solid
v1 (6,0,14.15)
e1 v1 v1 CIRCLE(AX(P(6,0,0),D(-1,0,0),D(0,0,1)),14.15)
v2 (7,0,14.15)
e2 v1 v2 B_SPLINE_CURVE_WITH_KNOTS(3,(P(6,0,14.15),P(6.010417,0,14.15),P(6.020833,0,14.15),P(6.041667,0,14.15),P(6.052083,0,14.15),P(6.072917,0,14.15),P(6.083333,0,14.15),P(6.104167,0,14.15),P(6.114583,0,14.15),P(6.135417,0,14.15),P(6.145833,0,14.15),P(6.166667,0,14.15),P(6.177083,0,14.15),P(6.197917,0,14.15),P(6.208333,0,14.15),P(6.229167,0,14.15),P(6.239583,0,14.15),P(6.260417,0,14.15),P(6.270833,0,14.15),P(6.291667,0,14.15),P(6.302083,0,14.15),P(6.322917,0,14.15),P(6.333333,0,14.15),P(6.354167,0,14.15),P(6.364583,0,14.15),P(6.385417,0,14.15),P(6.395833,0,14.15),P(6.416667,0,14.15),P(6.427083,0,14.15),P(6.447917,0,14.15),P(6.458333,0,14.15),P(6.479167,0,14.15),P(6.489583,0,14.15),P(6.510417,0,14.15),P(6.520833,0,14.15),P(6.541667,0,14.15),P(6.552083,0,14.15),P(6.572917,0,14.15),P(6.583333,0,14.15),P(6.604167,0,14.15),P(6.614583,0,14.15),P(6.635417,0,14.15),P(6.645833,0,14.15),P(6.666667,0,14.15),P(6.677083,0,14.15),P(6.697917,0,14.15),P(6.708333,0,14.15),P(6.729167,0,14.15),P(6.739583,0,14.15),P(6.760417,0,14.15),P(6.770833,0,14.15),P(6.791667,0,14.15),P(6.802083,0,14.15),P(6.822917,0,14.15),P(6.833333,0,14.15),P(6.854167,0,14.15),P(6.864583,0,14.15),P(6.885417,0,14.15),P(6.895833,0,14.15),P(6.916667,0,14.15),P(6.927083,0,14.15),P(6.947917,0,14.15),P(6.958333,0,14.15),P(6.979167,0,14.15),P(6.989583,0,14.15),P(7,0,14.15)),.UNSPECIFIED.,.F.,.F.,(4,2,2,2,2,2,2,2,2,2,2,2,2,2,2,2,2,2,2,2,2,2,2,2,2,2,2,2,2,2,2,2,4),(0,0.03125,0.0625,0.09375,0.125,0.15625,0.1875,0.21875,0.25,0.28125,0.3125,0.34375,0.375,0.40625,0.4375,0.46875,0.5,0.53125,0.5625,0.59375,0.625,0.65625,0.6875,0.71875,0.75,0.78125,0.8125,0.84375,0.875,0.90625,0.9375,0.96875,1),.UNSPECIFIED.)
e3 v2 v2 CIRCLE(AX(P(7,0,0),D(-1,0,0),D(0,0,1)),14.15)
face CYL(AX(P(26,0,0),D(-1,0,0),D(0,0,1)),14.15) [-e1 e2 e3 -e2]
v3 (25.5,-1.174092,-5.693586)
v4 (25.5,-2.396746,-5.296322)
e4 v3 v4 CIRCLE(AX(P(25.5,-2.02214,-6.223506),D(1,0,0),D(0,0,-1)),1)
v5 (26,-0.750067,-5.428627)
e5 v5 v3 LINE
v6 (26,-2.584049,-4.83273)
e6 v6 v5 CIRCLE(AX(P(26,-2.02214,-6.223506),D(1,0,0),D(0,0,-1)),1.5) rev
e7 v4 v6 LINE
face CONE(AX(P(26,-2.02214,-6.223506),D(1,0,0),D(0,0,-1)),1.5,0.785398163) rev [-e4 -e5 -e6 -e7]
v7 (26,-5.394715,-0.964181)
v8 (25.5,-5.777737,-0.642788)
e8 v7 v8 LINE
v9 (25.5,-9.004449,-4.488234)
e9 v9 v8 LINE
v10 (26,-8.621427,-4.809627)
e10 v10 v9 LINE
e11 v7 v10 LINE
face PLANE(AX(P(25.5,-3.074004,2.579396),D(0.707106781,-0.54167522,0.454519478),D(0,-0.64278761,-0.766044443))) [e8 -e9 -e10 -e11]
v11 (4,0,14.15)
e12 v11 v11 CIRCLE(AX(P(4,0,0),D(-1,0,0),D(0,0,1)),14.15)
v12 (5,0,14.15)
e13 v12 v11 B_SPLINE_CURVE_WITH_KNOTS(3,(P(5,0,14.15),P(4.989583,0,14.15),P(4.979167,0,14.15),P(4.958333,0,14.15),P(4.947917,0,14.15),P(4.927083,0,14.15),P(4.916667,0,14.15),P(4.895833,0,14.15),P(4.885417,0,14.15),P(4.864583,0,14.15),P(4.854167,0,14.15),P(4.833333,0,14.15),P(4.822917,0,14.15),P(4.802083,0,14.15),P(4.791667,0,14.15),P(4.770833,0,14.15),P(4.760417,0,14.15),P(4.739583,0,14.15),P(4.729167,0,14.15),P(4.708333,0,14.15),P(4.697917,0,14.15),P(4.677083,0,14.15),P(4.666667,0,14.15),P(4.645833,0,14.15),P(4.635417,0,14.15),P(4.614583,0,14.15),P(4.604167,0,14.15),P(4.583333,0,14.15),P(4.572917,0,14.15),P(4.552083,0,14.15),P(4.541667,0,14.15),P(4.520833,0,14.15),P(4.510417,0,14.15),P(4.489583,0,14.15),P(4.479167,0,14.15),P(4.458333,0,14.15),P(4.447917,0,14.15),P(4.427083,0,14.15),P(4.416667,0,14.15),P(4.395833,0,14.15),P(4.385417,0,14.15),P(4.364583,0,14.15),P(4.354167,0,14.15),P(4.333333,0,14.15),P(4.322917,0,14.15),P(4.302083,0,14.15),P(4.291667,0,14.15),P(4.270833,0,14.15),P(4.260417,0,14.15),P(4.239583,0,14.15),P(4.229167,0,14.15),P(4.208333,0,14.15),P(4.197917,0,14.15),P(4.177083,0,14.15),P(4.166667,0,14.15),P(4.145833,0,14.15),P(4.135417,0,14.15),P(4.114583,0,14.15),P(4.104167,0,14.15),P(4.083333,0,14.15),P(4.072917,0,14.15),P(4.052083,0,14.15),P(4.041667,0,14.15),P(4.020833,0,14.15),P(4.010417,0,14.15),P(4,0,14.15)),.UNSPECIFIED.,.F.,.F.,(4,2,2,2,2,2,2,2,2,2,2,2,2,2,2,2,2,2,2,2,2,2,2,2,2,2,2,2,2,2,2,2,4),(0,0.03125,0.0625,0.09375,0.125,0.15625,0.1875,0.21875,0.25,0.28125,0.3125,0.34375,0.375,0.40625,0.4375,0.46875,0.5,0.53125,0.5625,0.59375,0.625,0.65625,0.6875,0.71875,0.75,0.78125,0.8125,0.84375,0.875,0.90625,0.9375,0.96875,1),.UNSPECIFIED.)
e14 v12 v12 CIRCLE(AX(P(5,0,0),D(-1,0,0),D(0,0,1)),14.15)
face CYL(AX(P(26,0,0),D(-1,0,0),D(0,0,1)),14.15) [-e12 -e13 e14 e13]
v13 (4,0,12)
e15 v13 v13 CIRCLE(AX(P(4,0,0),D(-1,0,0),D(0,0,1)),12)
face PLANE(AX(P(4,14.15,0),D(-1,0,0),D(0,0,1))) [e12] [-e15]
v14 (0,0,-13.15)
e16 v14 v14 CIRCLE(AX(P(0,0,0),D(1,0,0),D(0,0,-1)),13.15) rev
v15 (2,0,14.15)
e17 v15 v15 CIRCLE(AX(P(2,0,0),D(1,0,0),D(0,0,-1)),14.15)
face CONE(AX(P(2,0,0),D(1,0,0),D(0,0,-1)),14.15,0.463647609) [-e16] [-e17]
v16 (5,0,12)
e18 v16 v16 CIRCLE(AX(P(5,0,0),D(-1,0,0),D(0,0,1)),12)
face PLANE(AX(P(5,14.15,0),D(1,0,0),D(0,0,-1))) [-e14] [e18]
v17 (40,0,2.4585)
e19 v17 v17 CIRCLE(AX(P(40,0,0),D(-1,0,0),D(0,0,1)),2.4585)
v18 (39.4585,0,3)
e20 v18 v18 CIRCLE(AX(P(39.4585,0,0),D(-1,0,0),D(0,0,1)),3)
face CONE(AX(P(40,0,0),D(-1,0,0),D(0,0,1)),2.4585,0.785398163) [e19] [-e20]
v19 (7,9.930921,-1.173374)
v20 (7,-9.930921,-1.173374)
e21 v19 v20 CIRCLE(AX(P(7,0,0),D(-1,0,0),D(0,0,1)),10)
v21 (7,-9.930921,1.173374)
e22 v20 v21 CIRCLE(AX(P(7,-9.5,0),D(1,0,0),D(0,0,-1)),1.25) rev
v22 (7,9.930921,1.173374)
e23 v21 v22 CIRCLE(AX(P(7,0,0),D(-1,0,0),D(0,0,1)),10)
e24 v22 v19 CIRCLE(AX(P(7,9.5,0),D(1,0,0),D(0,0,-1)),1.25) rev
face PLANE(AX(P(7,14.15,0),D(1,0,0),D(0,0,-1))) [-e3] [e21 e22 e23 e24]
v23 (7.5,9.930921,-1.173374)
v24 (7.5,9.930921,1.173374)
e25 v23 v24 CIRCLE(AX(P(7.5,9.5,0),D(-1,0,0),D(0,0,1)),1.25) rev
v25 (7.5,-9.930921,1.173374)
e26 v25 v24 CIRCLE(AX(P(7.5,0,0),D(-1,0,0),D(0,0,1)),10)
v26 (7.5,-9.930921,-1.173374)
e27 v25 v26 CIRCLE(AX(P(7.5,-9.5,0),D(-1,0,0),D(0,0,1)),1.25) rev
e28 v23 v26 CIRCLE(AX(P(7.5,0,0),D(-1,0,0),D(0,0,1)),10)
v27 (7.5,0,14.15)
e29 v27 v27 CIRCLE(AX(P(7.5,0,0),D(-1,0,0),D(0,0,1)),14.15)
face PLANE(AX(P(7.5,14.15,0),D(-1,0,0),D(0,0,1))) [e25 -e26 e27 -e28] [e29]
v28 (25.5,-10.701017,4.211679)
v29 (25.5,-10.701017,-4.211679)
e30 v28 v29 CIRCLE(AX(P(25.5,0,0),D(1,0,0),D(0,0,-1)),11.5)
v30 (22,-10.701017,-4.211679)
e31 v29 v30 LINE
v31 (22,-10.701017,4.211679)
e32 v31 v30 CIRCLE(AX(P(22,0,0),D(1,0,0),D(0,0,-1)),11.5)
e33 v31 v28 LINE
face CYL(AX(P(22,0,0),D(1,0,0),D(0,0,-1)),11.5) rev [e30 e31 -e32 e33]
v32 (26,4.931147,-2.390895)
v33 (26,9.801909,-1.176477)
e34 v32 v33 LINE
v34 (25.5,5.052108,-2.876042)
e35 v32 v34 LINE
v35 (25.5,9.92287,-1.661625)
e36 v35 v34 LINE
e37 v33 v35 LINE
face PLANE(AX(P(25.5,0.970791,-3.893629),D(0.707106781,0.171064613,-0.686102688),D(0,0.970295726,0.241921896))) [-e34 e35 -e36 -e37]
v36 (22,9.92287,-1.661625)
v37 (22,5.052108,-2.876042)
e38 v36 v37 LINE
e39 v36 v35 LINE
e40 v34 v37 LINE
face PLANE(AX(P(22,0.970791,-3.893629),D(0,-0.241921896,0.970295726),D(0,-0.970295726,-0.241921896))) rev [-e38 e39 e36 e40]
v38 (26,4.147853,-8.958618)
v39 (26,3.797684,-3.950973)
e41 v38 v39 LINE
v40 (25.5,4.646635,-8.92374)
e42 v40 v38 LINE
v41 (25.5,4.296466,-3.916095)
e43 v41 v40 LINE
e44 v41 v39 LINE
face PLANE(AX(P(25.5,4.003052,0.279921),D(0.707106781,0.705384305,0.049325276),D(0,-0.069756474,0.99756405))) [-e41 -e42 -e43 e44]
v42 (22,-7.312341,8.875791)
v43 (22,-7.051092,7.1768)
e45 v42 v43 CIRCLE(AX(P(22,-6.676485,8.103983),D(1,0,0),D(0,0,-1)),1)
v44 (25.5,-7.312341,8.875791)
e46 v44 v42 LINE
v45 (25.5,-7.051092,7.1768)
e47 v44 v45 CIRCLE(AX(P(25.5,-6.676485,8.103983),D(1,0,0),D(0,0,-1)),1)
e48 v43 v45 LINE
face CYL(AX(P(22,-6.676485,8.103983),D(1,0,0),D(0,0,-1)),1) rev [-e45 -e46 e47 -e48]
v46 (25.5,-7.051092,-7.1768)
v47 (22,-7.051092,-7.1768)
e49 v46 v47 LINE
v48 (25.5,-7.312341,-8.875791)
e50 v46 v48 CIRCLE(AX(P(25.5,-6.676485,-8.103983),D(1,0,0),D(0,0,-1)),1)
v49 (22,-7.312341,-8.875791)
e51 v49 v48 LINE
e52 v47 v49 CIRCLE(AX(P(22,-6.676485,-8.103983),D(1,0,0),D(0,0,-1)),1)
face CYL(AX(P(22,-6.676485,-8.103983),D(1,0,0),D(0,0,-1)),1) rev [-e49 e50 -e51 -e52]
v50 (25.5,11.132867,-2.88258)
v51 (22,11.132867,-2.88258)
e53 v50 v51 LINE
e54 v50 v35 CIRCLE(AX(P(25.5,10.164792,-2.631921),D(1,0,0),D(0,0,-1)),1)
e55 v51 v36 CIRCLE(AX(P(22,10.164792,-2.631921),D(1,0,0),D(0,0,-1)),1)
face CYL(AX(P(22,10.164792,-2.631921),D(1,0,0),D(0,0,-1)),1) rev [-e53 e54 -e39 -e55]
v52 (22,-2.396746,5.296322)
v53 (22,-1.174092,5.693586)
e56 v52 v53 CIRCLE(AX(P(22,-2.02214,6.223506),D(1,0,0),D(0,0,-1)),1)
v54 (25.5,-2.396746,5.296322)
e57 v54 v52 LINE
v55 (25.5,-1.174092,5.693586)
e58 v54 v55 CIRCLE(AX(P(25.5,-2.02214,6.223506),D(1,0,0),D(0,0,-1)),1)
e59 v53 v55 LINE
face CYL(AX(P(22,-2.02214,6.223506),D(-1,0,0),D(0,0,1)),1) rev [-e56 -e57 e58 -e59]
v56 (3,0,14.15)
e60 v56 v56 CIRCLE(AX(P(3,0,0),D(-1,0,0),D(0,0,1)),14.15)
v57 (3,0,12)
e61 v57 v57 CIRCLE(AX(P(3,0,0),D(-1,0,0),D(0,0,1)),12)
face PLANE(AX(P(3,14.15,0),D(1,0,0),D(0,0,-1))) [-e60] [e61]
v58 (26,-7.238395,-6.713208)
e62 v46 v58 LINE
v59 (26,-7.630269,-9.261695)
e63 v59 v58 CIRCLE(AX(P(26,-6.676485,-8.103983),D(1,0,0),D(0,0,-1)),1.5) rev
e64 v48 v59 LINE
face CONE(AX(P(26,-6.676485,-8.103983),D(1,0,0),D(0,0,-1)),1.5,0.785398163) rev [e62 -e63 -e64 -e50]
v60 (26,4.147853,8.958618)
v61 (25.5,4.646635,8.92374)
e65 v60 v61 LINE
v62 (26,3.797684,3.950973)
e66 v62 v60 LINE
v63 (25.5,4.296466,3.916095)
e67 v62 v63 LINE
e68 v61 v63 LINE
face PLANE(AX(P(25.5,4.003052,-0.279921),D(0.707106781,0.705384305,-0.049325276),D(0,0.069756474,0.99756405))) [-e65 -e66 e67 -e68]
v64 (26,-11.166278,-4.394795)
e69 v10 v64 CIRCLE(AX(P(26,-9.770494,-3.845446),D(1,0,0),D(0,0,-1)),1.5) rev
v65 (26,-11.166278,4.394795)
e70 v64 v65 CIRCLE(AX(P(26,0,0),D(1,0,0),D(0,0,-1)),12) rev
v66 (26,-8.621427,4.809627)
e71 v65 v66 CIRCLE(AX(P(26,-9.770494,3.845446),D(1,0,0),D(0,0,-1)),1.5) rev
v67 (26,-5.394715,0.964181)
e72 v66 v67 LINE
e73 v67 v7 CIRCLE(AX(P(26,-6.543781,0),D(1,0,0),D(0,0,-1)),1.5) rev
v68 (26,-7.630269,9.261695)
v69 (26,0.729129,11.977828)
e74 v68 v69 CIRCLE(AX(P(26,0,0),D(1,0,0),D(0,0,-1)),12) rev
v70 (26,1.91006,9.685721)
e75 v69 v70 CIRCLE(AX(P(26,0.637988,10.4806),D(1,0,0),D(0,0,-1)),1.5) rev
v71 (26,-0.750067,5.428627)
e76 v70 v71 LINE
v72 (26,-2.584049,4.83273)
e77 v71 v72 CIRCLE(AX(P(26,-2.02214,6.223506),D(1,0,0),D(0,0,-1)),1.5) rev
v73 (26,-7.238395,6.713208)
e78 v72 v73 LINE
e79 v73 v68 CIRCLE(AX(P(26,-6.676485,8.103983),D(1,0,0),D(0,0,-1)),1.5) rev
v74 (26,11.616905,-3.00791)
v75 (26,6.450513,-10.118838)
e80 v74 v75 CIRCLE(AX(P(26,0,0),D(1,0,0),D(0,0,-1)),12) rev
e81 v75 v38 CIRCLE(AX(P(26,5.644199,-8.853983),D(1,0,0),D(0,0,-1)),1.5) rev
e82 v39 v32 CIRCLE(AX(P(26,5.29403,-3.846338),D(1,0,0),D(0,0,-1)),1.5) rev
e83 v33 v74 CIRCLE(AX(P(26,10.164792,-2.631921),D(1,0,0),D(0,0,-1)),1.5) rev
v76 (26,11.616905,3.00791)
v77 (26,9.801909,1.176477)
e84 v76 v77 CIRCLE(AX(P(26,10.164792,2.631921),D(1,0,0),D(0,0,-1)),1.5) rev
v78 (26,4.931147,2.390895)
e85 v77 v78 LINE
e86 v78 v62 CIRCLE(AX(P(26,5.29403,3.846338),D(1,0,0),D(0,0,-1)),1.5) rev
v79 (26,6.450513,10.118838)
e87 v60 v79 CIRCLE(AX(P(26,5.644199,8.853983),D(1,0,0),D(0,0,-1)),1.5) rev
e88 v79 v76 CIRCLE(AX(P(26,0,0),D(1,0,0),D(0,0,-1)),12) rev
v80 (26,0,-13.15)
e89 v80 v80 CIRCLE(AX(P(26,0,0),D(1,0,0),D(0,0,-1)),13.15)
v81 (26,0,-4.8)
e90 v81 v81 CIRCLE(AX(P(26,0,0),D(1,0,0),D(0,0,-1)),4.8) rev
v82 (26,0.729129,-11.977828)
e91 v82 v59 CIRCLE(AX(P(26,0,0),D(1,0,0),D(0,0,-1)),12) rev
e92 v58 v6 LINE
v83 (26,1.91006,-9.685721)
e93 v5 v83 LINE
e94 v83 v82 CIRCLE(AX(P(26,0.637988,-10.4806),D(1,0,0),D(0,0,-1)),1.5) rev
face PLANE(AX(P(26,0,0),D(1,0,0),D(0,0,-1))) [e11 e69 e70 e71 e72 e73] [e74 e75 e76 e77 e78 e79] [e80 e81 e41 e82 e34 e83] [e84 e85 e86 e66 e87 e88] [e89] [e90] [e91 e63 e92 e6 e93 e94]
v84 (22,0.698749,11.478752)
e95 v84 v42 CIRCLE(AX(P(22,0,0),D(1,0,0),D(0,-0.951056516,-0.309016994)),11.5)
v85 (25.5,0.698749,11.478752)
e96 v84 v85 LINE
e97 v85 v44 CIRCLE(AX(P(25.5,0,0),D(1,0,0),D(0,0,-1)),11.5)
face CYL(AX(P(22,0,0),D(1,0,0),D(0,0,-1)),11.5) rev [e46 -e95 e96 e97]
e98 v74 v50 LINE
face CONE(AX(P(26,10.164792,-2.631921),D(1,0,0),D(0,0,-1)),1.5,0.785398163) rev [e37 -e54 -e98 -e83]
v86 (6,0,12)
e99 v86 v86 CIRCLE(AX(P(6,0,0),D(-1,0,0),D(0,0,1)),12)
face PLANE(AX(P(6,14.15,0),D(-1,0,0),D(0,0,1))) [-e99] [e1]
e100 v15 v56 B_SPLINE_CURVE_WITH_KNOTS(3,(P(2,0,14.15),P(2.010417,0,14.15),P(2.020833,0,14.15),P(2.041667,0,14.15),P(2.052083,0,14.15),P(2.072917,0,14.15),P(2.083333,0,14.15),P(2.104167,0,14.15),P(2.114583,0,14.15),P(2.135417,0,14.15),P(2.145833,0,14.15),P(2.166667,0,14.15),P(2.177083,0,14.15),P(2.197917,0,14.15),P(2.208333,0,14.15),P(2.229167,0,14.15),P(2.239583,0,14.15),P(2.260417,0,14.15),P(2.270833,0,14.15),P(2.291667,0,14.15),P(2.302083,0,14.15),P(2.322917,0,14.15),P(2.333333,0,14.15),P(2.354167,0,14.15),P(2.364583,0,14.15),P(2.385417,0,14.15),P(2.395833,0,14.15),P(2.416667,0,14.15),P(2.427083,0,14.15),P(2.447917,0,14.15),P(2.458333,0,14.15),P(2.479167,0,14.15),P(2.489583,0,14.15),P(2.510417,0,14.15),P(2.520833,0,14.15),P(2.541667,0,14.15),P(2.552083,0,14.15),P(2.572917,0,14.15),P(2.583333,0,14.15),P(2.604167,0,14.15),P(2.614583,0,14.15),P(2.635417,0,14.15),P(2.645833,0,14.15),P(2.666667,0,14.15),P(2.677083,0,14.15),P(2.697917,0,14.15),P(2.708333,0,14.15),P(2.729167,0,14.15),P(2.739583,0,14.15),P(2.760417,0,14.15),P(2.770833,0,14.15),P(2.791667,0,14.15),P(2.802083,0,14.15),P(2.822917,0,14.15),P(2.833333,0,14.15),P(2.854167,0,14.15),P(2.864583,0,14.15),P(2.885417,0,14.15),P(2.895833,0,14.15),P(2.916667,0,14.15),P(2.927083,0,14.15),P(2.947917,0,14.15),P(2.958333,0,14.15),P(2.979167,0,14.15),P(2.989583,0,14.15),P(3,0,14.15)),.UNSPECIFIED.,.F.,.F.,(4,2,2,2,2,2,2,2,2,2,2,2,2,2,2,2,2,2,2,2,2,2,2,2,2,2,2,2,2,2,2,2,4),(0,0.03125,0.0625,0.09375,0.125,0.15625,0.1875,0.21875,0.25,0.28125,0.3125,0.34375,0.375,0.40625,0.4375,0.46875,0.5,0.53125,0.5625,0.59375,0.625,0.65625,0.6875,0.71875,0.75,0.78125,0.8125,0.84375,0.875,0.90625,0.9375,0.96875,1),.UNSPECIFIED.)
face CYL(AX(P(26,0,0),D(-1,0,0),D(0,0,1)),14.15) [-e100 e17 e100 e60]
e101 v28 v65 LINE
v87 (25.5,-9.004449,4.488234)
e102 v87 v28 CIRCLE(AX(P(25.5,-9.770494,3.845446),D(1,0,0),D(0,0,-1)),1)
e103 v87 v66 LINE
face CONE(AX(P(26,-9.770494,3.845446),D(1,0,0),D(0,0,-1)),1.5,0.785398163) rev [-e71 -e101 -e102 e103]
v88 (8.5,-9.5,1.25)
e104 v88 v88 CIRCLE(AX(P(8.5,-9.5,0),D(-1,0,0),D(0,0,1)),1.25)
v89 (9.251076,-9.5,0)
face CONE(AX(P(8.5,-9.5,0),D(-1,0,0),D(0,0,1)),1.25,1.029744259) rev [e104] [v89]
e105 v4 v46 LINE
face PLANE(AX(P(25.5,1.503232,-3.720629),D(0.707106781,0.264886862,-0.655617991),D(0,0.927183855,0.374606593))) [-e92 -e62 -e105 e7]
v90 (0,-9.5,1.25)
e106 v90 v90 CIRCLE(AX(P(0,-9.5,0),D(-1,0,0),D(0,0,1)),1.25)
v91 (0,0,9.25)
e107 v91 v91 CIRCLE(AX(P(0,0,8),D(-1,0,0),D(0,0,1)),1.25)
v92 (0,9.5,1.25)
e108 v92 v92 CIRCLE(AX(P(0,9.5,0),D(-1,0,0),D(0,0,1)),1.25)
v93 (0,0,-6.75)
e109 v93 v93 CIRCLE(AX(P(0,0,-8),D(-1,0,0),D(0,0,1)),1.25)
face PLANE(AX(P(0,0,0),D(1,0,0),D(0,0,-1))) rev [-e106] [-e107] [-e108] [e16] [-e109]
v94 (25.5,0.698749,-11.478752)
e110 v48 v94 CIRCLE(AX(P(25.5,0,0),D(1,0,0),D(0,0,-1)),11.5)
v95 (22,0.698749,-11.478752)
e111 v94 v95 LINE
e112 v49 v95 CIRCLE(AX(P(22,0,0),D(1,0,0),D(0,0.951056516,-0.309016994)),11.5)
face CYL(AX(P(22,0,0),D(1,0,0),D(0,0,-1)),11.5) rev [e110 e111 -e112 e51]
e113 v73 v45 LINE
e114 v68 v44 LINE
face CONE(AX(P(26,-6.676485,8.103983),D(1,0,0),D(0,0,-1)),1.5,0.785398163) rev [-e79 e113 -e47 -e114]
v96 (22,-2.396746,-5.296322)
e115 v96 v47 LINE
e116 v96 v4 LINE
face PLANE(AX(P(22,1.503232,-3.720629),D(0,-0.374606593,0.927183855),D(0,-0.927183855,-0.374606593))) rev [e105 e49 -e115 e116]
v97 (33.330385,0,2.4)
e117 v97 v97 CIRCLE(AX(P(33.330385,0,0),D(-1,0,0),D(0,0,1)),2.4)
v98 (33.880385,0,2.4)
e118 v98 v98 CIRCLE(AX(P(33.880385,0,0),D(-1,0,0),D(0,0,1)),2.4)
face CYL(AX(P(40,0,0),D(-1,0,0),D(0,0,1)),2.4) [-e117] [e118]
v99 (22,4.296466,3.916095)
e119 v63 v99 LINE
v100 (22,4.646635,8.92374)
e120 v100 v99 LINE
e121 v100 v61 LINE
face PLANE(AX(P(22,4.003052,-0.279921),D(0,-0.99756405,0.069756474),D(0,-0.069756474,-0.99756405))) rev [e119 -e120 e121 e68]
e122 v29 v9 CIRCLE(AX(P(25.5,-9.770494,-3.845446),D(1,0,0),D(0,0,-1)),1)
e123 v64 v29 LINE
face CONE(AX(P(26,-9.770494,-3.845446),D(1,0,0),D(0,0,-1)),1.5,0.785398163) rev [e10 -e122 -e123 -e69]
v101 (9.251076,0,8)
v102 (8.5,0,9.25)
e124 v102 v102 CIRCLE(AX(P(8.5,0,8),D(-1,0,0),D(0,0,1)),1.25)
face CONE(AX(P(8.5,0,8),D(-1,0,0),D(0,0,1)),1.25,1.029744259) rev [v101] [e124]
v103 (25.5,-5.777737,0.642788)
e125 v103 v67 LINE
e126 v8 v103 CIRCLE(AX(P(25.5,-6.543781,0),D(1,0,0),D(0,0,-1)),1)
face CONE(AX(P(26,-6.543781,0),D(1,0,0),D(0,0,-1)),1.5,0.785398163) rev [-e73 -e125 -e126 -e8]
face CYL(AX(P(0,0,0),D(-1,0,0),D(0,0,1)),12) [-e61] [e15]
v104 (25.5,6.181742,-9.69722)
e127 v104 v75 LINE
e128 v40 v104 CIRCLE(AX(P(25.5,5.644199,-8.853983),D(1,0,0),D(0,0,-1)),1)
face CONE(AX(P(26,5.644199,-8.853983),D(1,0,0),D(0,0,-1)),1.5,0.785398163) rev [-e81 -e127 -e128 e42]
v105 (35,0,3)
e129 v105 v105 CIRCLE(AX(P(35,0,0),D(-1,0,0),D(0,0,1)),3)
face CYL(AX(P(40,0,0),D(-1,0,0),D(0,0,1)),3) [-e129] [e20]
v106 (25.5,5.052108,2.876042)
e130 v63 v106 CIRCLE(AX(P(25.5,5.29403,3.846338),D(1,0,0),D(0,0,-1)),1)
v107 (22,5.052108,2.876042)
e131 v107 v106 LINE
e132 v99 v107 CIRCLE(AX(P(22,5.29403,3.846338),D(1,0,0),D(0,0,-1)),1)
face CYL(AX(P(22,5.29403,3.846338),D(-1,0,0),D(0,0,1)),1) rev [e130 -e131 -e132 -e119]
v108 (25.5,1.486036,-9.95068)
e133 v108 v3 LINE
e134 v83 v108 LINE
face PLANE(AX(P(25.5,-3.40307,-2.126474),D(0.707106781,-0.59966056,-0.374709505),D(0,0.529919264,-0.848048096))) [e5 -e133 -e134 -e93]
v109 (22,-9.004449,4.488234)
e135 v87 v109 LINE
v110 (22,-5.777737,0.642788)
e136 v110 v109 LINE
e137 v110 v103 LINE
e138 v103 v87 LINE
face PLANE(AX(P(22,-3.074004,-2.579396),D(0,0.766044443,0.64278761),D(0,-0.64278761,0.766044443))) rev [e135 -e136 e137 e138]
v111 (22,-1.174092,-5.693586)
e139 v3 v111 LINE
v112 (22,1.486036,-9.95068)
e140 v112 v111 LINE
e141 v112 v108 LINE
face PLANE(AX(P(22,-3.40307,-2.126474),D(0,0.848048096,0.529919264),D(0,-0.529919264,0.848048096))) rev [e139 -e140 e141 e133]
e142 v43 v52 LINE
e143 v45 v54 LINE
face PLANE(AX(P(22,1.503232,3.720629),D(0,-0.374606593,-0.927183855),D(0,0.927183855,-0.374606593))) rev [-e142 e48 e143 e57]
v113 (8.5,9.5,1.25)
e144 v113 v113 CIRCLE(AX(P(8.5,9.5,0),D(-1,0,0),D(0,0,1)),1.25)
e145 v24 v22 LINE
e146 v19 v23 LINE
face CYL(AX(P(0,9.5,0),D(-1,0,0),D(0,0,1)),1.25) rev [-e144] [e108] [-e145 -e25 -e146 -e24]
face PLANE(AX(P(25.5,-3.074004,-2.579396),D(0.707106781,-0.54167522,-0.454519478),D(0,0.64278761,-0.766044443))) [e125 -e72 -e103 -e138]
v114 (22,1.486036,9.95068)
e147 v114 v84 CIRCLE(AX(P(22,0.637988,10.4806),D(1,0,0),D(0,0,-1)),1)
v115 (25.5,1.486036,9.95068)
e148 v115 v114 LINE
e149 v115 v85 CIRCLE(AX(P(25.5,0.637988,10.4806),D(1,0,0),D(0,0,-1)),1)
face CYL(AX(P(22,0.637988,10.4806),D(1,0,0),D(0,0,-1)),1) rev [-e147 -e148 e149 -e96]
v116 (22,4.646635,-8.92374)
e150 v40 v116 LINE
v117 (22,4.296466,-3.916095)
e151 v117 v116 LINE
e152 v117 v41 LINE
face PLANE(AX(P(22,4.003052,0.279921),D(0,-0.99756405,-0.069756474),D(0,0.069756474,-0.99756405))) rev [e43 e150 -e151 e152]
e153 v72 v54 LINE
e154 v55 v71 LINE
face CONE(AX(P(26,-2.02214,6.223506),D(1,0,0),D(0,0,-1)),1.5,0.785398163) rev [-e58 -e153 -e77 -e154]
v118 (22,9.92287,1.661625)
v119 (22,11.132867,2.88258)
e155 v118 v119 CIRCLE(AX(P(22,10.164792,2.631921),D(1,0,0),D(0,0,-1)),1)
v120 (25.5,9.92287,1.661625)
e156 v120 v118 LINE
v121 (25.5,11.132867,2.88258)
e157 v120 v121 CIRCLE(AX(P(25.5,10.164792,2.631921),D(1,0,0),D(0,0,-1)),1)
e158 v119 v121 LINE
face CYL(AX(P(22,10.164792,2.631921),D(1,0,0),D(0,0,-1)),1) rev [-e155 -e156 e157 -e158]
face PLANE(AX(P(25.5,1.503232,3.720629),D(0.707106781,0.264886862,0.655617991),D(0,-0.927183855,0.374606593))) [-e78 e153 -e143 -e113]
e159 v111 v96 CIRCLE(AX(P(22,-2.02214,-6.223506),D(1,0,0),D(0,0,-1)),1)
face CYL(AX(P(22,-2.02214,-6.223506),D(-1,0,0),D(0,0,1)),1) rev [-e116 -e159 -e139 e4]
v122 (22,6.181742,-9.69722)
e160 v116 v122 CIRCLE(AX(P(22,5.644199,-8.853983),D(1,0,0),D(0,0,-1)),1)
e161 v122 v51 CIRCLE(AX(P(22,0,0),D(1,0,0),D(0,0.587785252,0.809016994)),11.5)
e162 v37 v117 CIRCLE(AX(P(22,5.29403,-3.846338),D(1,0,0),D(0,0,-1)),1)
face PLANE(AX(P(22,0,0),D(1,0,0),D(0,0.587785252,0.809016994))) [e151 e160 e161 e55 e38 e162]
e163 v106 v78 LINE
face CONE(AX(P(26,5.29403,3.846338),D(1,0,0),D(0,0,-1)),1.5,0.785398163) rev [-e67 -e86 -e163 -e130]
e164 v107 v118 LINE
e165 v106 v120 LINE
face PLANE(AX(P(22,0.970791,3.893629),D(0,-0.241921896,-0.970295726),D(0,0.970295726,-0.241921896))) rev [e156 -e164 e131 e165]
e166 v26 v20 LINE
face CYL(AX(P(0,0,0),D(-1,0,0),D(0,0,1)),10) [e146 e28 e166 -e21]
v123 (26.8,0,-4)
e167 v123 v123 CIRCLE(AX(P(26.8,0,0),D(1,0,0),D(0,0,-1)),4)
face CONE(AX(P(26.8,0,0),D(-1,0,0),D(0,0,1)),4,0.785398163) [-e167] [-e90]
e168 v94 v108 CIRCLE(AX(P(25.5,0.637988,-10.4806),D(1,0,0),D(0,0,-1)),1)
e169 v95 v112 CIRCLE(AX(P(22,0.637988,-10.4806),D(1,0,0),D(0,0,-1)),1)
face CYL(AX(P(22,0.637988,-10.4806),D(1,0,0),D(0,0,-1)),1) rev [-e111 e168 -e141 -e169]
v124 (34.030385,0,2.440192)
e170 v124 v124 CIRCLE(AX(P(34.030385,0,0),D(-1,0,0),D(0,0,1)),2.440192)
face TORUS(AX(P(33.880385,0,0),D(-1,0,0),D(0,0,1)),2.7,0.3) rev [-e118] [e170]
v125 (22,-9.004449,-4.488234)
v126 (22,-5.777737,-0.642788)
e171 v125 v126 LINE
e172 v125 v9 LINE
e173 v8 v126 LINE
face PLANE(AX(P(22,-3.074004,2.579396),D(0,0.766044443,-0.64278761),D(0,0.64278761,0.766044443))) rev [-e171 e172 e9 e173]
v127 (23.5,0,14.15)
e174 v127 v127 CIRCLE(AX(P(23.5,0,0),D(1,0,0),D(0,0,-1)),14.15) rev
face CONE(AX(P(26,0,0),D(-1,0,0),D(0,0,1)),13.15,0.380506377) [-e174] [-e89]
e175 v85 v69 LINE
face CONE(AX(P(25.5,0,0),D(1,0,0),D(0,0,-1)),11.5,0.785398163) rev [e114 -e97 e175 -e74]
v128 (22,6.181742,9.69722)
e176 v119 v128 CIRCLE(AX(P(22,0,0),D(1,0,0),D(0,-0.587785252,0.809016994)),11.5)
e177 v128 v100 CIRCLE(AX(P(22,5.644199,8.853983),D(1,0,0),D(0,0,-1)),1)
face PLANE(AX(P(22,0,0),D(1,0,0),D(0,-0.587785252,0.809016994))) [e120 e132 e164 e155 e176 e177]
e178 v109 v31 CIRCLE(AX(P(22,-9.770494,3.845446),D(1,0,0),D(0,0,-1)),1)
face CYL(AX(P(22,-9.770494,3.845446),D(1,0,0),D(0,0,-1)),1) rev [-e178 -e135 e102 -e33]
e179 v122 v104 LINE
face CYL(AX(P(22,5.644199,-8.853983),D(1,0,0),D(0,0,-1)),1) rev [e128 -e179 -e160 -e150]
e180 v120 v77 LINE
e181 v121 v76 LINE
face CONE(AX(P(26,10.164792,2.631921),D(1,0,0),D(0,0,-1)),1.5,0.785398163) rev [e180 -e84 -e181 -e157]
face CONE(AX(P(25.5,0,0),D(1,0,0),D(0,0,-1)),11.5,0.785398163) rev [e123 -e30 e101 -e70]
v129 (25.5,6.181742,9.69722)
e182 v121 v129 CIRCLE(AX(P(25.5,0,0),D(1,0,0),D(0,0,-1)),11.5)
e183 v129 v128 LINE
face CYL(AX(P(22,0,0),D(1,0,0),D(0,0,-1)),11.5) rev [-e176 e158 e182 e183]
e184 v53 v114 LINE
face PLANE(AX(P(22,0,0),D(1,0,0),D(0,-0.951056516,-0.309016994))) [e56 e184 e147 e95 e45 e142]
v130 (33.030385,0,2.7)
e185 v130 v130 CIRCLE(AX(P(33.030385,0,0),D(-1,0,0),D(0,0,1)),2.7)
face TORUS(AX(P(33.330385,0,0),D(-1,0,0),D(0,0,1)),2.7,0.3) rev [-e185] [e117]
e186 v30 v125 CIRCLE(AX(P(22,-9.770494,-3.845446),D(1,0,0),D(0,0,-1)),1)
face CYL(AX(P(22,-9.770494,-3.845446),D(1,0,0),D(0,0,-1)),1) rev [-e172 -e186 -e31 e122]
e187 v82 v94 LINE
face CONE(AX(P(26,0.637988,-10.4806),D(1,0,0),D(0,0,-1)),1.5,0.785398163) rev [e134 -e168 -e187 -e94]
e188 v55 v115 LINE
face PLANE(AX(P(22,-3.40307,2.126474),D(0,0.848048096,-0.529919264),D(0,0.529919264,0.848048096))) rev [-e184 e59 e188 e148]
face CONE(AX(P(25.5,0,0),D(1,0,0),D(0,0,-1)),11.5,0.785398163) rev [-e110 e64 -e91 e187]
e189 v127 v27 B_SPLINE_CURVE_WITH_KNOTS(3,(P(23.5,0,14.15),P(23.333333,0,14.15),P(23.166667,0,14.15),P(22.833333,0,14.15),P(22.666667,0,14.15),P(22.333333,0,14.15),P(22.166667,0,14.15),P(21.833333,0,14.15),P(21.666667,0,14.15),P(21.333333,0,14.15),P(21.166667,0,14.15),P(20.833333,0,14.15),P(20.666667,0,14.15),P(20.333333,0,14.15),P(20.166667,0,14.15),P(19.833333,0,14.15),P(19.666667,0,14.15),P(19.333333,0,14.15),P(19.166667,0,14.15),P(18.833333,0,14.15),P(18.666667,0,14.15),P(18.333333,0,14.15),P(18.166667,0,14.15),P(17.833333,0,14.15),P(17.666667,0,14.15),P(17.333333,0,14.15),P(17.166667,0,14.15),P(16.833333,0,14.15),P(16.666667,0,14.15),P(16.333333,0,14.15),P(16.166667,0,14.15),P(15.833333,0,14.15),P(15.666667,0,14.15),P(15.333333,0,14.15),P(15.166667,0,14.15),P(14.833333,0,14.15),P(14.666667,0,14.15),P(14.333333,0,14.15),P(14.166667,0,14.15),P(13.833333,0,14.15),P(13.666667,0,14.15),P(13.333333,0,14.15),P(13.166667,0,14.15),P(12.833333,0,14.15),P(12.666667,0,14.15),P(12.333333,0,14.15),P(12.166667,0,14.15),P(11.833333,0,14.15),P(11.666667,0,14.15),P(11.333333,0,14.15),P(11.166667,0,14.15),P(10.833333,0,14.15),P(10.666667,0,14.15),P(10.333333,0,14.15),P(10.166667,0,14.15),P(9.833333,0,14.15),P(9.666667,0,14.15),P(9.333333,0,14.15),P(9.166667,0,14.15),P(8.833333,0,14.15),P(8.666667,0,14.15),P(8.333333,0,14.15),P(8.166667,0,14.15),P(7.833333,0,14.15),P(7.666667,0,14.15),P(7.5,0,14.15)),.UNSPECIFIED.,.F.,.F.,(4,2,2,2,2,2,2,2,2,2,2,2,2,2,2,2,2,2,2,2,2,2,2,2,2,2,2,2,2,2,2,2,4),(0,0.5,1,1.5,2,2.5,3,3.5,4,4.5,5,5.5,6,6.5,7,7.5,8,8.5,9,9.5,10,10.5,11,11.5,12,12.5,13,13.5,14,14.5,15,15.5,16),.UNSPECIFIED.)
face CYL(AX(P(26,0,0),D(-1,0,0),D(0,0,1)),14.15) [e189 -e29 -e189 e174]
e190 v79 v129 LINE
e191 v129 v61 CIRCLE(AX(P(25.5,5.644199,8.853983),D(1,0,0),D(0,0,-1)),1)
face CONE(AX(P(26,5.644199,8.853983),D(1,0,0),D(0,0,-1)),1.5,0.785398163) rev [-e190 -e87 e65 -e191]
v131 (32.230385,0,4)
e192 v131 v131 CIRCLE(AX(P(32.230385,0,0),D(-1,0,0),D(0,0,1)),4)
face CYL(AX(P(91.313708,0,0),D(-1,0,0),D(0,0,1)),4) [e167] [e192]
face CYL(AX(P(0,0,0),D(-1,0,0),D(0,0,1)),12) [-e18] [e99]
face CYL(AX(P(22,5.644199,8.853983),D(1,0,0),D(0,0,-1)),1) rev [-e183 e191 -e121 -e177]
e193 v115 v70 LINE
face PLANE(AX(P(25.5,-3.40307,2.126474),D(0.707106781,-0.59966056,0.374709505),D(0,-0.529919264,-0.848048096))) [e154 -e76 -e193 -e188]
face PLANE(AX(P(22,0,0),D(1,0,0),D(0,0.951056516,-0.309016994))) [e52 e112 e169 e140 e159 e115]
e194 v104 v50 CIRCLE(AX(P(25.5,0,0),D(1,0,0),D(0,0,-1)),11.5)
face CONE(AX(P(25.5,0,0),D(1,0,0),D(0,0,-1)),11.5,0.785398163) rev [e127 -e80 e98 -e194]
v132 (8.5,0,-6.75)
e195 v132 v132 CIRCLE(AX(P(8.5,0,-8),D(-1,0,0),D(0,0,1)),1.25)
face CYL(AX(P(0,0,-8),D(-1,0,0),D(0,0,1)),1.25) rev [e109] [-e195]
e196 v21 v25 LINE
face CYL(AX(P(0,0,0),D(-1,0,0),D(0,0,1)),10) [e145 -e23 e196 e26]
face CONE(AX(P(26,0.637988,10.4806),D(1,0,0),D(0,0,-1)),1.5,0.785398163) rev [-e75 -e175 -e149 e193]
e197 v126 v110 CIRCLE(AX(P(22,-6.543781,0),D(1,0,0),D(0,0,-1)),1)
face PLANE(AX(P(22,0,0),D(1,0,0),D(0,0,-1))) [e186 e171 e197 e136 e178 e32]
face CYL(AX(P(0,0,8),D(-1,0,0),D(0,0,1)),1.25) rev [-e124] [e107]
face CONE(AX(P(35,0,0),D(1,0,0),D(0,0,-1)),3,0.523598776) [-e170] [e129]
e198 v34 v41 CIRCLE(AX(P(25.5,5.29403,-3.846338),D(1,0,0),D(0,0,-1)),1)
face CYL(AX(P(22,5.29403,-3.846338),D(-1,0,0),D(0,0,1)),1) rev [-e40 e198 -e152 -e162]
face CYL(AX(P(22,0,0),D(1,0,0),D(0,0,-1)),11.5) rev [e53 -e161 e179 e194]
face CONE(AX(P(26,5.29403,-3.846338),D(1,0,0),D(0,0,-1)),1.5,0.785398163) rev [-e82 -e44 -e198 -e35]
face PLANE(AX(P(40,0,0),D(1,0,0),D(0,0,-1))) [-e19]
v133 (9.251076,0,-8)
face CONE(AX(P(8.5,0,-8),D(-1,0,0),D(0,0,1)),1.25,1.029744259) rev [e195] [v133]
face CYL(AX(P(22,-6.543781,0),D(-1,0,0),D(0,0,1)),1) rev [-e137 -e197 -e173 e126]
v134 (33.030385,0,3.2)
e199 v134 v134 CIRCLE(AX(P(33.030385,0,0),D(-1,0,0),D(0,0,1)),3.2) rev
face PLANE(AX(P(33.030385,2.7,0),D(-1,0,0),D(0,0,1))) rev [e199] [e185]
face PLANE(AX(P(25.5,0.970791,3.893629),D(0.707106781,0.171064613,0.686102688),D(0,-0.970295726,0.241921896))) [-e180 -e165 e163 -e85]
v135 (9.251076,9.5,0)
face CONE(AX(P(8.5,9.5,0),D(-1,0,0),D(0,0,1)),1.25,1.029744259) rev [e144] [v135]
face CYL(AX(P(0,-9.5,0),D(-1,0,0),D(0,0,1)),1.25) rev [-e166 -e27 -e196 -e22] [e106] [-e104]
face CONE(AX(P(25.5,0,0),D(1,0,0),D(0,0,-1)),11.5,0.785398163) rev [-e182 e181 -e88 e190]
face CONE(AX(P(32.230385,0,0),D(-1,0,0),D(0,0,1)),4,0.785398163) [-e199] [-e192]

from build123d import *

# Parameters (mm, degrees)
SKETCH_1_R                       = 14.15
EXTRUDE_1_DEPTH                  = 26
SKETCH_2_R                       = 4
EXTRUDE_2_DEPTH                  = 14
CHAMFER1_SIZE                    = 0.8
HOLE_WIZARD_M3_1_D               = 2.5
HOLE_WIZARD_M3_1_DEPTH           = 8.5
HOLE_WIZARD_M3_1_TIP             = 0.751075774
CHAMFER_1_SIZE                   = 2.5
CHAMFER_1_SIZE2                  = 1
CUT_EXTRUDE_1_DEPTH              = 4
FILLET_1_R                       = 1
PATTERN_CIRCULAR_1_COUNT         = 5
FILLET_1_OF_PATTERN_CIRCULAR_1_R = 1
CHAMFER2_SIZE                    = 0.5
SKETCH2_W                        = 0.5
SKETCH2_H                        = 4.15
SKETCH2_W_2                      = 1
SKETCH2_H_2                      = 2.15
CHAMFER3_SIZE                    = 1
CHAMFER3_SIZE2                   = 2


# Read off the part's stored shape, not the designer's step: M6 Machine Threads Stud1
with BuildPart() as part:
    # 草图1 → 凸台-拉伸1 (new body)
    with BuildSketch(Plane(origin=(0, 0, 0), x_dir=(0, 0, -1), z_dir=(1, 0, 0))):
        with Locations(Location((0, 0, 0), (0, 0, 180))):
            Circle(SKETCH_1_R)
    extrude(amount=EXTRUDE_1_DEPTH)

    # 草图2 → 凸台-拉伸2 (add)
    with BuildSketch(Plane(origin=(26, 0, 0), x_dir=(0, 0, -1), z_dir=(1, 0, 0))):
        Circle(SKETCH_2_R)
    extrude(amount=EXTRUDE_2_DEPTH)

    # M6 Machine Threads Stud1 outline → M6 Machine Threads Stud1 (revolve, cut)
    with BuildSketch(Plane.YX):
        with BuildLine():
            Line((4, 40), (2.4585, 40))
            Line((2.4585, 40), (3, 39.4585))
            Line((3, 39.4585), (3, 35))
            Line((3, 35), (2.440192379, 34.030384758))
            ThreePointArc((2.440192379, 34.030384758), (2.410222252, 33.958030472), (2.4, 33.880384758))
            Line((2.4, 33.880384758), (2.4, 33.330384758))
            ThreePointArc((2.4, 33.330384758), (2.487867965, 33.118252723), (2.7, 33.030384758))
            Line((2.7, 33.030384758), (4, 33.030384758))
            Line((4, 33.030384758), (4, 40))
        make_face()
    revolve(axis=Axis((0, 0, 0), (1, 0, 0)), mode=Mode.SUBTRACT)

    # Chamfer1
    chamfer1_edges = [part.edges().sort_by_distance(p)[0] for p in [
        (33.030384758, 0, 4),
        (26, 0, 4),
    ]]
    chamfer(chamfer1_edges, length=CHAMFER1_SIZE)

    # M3 螺纹孔1
    with Locations(Plane.ZY):
        with Locations((8, 0), (0, 9.5), (0, -9.5), (-8, 0)):
            Hole(HOLE_WIZARD_M3_1_D / 2, depth=HOLE_WIZARD_M3_1_DEPTH)
            with Locations((0, 0, -(HOLE_WIZARD_M3_1_DEPTH + HOLE_WIZARD_M3_1_TIP / 2))):  # 118° drill point
                Cone(0, HOLE_WIZARD_M3_1_D / 2, HOLE_WIZARD_M3_1_TIP, mode=Mode.SUBTRACT)

    # 倒角1
    chamfer_1_edges = [part.edges().sort_by_distance(p)[0] for p in [
        (26, 0, -14.15),
    ]]
    chamfer_1_side = [part.faces().sort_by_distance(p)[0] for p in [
        (13, 0, -14.15),
    ]]
    chamfer(chamfer_1_edges, length=CHAMFER_1_SIZE, length2=CHAMFER_1_SIZE2, reference=chamfer_1_side[0])

    # 草图8 → 切除-拉伸1 (cut)
    with BuildSketch(Plane(origin=(26, 0, 0), x_dir=(0, 0, -1), z_dir=(1, 0, 0))):
        with BuildLine():
            Line((0, -5.238373922), (-5.676389324, -10.00143011))
            ThreePointArc((-5.676389324, -10.00143011), (0, -11.5), (5.676389324, -10.00143011))
            Line((5.676389324, -10.00143011), (0, -5.238373922))
        make_face()
    cut_extrude_1 = extrude(amount=-CUT_EXTRUDE_1_DEPTH, mode=Mode.SUBTRACT)

    # 圆角1
    fillet_1_edges = [part.edges().sort_by_distance(p)[0] for p in [
        (24, -10.00143011, 5.676389324),
        (24, -5.238373922, 0),
        (24, -10.00143011, -5.676389324),
    ]]
    fillet(fillet_1_edges, radius=FILLET_1_R)

    # 阵列(圆周)1: 切除-拉伸1 ×5 about axis
    pattern_circular_1_axis = Axis((0, 0, 0), (1, 0, 0))
    for i in range(1, PATTERN_CIRCULAR_1_COUNT):
        add(cut_extrude_1.rotate(pattern_circular_1_axis, i * 360 / PATTERN_CIRCULAR_1_COUNT), mode=Mode.SUBTRACT)

    # 圆角1 of 阵列(圆周)1
    fillet_1_of_pattern_circular_1_edges = [part.edges().sort_by_distance(p)[0] for p in [
        (24, -8.489178927, -7.757824511),
        (24, -1.618746565, -4.981989654),
        (24, 2.307955183, -11.266026046),
        (24, 4.754828997, -10.47098855),
        (24, 4.237933526, -3.079038938),
        (24, 11.427824858, -1.286397691),
        (24, 11.427824858, 1.286397691),
        (24, 4.237933526, 3.079038938),
        (24, 4.754828997, 10.47098855),
        (24, 2.307955183, 11.266026046),
        (24, -1.618746565, 4.981989654),
        (24, -8.489178927, 7.757824511),
    ]]
    fillet(fillet_1_of_pattern_circular_1_edges, radius=FILLET_1_OF_PATTERN_CIRCULAR_1_R)

    # Chamfer2
    chamfer2_edges = [part.edges().sort_by_distance(p)[0] for p in [
        (26, 0.155972278, 7.822133498),
        (26, -4.723918935, 6.236560727),
        (26, -3.553695435, 10.937149937),
        (26, -1.713122608, 5.272449246),
        (26, 1.526939092, 10.938601831),
        (26, -7.664868512, 7.952002496),
        (26, 7.487489119, 2.268833731),
        (26, 4.471550488, 6.419917137),
        (26, 9.303695435, 6.759530401),
        (26, 4.485013213, 3.258552838),
        (26, 10.875078679, 1.928008487),
        (26, 5.194229162, 9.747027055),
        (26, 4.471550488, -6.419917137),
        (26, 7.487489119, -2.268833731),
        (26, 9.303695435, -6.759530401),
        (26, 4.485013213, -3.258552838),
        (26, 5.194229162, -9.747027055),
        (26, 10.875078679, -1.928008487),
        (26, -4.723918935, -6.236560727),
        (26, 0.155972278, -7.822133498),
        (26, -3.553695435, -10.937149937),
        (26, -1.713122608, -5.272449246),
        (26, -7.664868512, -7.952002496),
        (26, 1.526939092, -10.938601831),
        (26, -7.39109295, 2.565510635),
        (26, -7.39109295, -2.565510635),
        (26, -11.5, 0),
        (26, -5.543781212, 0),
        (26, -9.931378421, 4.832419234),
        (26, -9.931378421, -4.832419234),
    ]]
    chamfer(chamfer2_edges, length=CHAMFER2_SIZE)

    # Sketch2 → Cut-Revolve1 (revolve, cut)
    with BuildSketch(Plane.XY, mode=Mode.PRIVATE) as cut_revolve1_sk:
        with Locations((7.25, 12.075)):
            Rectangle(SKETCH2_W, SKETCH2_H)
        with Locations((3.5, 13.075)):
            Rectangle(SKETCH2_W_2, SKETCH2_H_2)
        with Locations((5.5, 13.075)):
            Rectangle(SKETCH2_W_2, SKETCH2_H_2)
    revolve(cut_revolve1_sk.sketch.rotate(Axis((0, 0, 0), (1, 0, 0)), 90), axis=Axis((0, 0, 0), (1, 0, 0)), mode=Mode.SUBTRACT)

    # Chamfer3
    chamfer3_edges = [part.edges().sort_by_distance(p)[0] for p in [
        (0, 0, -14.15),
    ]]
    chamfer3_side = [part.faces().sort_by_distance(p)[0] for p in [
        (0, 0, 0),
    ]]
    chamfer(chamfer3_edges, length=CHAMFER3_SIZE, length2=CHAMFER3_SIZE2, reference=chamfer3_side[0])


solid = part.part
